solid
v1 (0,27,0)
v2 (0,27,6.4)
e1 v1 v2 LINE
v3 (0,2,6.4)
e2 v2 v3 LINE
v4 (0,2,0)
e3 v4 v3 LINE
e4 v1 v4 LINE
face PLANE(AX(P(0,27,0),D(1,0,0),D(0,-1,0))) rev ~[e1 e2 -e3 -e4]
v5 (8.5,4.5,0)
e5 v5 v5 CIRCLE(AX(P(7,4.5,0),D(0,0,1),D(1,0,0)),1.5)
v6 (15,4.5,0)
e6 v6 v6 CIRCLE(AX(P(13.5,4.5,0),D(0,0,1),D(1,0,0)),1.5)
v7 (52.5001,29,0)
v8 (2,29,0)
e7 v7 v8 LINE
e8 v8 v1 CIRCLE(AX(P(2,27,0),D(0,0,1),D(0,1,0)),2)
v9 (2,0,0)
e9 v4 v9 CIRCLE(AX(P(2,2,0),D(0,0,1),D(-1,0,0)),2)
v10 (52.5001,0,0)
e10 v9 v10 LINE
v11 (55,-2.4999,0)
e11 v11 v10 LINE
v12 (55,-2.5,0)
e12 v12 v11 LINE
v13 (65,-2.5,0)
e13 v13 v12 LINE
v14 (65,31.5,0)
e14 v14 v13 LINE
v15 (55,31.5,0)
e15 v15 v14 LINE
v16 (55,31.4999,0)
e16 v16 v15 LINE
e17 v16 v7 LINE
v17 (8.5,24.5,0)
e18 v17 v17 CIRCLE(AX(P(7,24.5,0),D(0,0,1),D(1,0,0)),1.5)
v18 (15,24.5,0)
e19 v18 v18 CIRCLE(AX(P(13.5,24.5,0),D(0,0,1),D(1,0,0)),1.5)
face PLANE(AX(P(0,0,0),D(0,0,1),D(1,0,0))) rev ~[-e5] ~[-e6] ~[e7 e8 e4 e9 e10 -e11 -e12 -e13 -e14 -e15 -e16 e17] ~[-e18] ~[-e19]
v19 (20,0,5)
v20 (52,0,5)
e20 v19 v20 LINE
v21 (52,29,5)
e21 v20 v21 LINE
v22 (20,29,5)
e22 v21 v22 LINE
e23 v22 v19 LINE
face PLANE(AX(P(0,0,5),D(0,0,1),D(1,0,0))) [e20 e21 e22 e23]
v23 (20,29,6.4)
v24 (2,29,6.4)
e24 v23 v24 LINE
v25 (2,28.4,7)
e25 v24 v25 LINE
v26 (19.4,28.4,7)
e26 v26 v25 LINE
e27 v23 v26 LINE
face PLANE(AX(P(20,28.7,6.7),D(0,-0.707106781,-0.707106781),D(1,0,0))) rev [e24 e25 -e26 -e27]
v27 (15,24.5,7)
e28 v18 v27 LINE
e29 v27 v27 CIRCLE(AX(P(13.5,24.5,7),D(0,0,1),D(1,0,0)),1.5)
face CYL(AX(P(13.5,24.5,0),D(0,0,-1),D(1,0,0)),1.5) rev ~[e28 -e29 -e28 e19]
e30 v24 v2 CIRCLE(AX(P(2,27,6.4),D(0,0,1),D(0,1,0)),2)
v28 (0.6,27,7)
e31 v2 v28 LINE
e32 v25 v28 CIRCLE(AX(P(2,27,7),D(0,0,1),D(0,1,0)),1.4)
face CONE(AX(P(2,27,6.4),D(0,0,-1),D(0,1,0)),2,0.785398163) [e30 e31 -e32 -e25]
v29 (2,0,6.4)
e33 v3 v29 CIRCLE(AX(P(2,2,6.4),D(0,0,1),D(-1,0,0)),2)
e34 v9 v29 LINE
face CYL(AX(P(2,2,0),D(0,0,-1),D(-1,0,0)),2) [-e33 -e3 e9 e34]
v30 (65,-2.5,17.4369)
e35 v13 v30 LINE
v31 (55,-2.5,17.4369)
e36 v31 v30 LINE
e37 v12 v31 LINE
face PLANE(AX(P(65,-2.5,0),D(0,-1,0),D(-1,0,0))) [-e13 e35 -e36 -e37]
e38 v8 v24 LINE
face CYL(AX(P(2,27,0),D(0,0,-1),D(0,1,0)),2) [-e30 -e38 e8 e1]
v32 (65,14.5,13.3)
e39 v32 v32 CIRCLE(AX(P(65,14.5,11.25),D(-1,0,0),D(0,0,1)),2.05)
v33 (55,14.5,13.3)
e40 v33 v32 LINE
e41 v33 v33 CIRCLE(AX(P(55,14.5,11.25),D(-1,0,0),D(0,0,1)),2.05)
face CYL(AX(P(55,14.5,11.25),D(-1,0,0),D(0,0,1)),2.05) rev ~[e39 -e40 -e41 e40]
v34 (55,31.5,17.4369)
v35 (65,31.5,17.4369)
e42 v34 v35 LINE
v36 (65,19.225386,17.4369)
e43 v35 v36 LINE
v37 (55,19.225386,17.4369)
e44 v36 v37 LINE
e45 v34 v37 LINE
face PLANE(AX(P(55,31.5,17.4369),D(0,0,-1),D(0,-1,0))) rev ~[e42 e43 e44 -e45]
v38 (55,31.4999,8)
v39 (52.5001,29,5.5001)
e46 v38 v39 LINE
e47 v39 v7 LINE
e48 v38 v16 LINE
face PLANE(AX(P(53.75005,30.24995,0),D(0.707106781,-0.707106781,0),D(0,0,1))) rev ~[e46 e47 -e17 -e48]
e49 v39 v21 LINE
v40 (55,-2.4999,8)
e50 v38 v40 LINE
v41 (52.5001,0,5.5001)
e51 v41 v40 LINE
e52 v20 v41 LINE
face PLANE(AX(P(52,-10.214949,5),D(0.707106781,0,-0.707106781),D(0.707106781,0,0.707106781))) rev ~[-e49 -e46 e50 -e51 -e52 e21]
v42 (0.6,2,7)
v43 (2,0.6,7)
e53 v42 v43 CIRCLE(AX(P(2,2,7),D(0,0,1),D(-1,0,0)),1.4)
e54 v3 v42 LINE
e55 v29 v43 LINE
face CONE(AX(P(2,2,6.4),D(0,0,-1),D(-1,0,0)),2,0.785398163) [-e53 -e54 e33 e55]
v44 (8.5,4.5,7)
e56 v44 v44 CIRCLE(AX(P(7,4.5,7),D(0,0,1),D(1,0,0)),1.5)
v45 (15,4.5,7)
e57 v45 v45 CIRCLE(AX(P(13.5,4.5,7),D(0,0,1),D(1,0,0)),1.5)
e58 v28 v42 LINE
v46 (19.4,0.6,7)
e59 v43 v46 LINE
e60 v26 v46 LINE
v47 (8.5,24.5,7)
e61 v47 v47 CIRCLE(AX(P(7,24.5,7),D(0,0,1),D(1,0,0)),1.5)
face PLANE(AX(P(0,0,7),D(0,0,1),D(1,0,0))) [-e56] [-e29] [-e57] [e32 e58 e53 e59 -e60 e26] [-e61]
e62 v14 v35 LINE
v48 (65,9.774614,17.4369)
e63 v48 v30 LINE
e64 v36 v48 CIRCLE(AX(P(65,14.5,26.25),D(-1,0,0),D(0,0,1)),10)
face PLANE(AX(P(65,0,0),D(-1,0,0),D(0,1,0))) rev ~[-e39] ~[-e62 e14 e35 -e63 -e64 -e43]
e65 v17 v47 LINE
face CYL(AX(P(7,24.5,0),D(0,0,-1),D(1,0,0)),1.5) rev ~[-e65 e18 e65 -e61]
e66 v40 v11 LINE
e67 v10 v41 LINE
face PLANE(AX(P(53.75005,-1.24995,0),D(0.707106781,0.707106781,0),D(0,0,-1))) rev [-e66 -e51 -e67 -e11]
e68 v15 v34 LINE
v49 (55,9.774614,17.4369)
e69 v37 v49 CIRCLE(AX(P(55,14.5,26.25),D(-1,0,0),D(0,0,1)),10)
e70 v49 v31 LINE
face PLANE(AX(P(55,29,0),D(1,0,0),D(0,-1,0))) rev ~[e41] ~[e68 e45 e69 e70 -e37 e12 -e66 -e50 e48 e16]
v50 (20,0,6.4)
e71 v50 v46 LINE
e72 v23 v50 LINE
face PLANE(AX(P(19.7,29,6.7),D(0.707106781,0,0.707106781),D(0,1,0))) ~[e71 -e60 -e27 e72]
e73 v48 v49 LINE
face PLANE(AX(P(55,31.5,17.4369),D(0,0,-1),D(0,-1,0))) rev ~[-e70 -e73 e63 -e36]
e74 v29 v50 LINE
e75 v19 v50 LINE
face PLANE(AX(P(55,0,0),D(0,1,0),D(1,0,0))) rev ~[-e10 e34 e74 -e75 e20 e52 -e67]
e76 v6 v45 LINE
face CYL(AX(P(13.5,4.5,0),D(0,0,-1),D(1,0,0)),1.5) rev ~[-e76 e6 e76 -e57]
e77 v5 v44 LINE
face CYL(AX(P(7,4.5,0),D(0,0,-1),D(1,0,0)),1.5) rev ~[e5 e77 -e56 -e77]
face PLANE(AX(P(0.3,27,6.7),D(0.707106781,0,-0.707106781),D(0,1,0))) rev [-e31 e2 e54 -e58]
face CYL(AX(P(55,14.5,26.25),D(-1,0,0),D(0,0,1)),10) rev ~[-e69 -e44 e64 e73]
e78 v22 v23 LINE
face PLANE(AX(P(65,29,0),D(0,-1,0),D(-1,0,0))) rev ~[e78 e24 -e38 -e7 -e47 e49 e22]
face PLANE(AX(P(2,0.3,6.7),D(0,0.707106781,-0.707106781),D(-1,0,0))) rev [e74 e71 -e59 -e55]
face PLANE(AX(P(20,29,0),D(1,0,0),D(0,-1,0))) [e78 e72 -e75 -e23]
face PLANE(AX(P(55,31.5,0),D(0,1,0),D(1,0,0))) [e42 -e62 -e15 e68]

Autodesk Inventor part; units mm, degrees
ref_plane "YZ Plane" through (0, 0, 0) normal (1, 0, 0) x (0, 1, 0)
ref_plane "XZ Plane" through (0, 0, 0) normal (0, 1, 0) x (-1, 0, 0)
ref_plane "XY Plane" through (0, 0, 0) normal (0, 0, 1) x (1, 0, 0)
sketch "Sketch1" plane through (0, 0, 0) normal (0, 0, 1) x (1, 0, 0)
  line L0 (2, 0) -> (65, 0)
  line L1 (65, 0) -> (65, 29)
  line L2 (65, 29) -> (2, 29)
  line L3 (0, 27) -> (0, 2)
  arc A0 (2, 29) -> (0, 27) centre (2, 27) ccw
  arc A1 (0, 2) -> (2, 0) centre (2, 2) ccw
  line L4 (20, 29) -> (20, 0)
  line L5 (55, 29) -> (55, 0)
  circle A2 centre (7, 24.5) radius 1.5
  circle A3 centre (7, 4.5) radius 1.5
  circle A4 centre (13.5, 24.5) radius 1.5
  circle A5 centre (13.5, 4.5) radius 1.5
  line L6 (65, 0) -> (65, -2.5)
  line L7 (65, -2.5) -> (55, -2.5)
  line L8 (55, -2.5) -> (55, 0)
  line L9 (55, 29) -> (55, 31.5)
  line L10 (55, 31.5) -> (65, 31.5)
  line L11 (65, 31.5) -> (65, 29)
  point P0 (0, 0)
  point P1 (0, 29)
  dimension "d0" = 65
  dimension "d1" = 29
  dimension "d2" = 2
  dimension "d3" = 20
  dimension "d4" = 10
  dimension "d5" = 3
  dimension "d6" = 3
  dimension "d7" = 4.5
  dimension "d8" = 4.5
  dimension "d9" = 20
  dimension "d10" = 3
  dimension "d11" = 3
  dimension "d12" = 20
  dimension "d13" = 6.5
  dimension "d14" = 7
  dimension "d24" = 2.5
  dimension "d25" = 2.5
extrude "Extrusion1" add sketch "Sketch1" along normal blind 5 contours L4 L2 L5 L0
extrude "Extrusion2" add sketch "Sketch1" along normal blind 7 contours A1 L3 A0 L2 L4 L0
extrude "Extrusion3" add sketch "Sketch1" along normal blind 26.25 contours L5 L2 L1 L0
sketch "Sketch2" plane through (55, 0, 5) normal (-1, 0, 0) x (0, 0, 1)
  line L0 (21.25, 29) -> (21.25, 0) projected
  circle A0 centre (21.25, 14.5) radius 10
  point P0 (-5, 0)
  point P1 (21.25, 4.5)
  point P2 (21.25, 24.5)
  dimension "d21" = 20
extrude "Extrusion4" cut sketch "Sketch2" against normal blind 20 contours L0 A0 picked at (15.0351, 13.318)
extrude "Extrusion5" add sketch "Sketch1" along normal blind 26.25 contours L0 L6 L7 L8 | L9 L10 L11 L2
chamfer "Chamfer1" distance 2.5 angle 45 1 edges at (55, 0, 2.5)
chamfer "Chamfer2" distance 2.5 angle 45 1 edges at (55, 29, 2.5)
chamfer "Chamfer4" distance 0.6 angle 45 6 edges at (20, 14.5, 7) (11, 0, 7) (0.5858, 0.5858, 7) (0, 14.5, 7) (0.5858, 28.4142, 7) (11, 29, 7)
sketch "Sketch5" plane through (55, 14.5, 26.25) normal (-1, 0, 0) x (0, 0, 1)
  circle A0 centre (-15, 0) radius 2.05
  line L0 (0, -10) -> (0, -17) projected
  point P0 (-26.25, -14.5)
  dimension "d48" = 4.1
  dimension "d49" = 15
extrude "Extrusion7" cut sketch "Sketch5" against normal blind 26.25
extrude "Extrusion8" cut sketch "Sketch5" along normal blind 26.25
sketch "Sketch6" plane through (55, 14.5, 26.25) normal (-1, 0, 0) x (0, 0, 1)
  line L0 (0, 17) -> (0, 10) projected
  line L1 (-21.25, -17) -> (0, -17) projected
  line L2 (0, 17) -> (-8.8131, 17)
  line L3 (-8.8131, 17) -> (-8.8131, -17)
  line L4 (-8.8131, -17) -> (0, -17)
  line L5 (0, -17) -> (0, 17)
  point P0 (-26.25, -14.5)
  point P1 (-15.25, -17)
extrude "Extrusion9" cut sketch "Sketch6" against normal blind 26.25
chamfer "Chamfer5" distance 3 angle 45 1 edges at (55, 14.5, 5)
equation "\"BendRadius\" = Thickness"
equation "\"BendReliefWidth\" = Thickness"
equation "\"BendReliefDepth\" = 0.5 * Thickness"
equation "\"CornerReliefSize\" = 4 * Thickness"
equation "\"MinimumRemnant\" = 2 * Thickness"
equation "\"TransitionRadius\" = BendRadius"
equation "\"JacobiRadiusSize\" = BendRadius"
equation "\"GapSize\" = Thickness"
equation "\"Thickness\" = 0.5"
properties part number "tool4_2"
